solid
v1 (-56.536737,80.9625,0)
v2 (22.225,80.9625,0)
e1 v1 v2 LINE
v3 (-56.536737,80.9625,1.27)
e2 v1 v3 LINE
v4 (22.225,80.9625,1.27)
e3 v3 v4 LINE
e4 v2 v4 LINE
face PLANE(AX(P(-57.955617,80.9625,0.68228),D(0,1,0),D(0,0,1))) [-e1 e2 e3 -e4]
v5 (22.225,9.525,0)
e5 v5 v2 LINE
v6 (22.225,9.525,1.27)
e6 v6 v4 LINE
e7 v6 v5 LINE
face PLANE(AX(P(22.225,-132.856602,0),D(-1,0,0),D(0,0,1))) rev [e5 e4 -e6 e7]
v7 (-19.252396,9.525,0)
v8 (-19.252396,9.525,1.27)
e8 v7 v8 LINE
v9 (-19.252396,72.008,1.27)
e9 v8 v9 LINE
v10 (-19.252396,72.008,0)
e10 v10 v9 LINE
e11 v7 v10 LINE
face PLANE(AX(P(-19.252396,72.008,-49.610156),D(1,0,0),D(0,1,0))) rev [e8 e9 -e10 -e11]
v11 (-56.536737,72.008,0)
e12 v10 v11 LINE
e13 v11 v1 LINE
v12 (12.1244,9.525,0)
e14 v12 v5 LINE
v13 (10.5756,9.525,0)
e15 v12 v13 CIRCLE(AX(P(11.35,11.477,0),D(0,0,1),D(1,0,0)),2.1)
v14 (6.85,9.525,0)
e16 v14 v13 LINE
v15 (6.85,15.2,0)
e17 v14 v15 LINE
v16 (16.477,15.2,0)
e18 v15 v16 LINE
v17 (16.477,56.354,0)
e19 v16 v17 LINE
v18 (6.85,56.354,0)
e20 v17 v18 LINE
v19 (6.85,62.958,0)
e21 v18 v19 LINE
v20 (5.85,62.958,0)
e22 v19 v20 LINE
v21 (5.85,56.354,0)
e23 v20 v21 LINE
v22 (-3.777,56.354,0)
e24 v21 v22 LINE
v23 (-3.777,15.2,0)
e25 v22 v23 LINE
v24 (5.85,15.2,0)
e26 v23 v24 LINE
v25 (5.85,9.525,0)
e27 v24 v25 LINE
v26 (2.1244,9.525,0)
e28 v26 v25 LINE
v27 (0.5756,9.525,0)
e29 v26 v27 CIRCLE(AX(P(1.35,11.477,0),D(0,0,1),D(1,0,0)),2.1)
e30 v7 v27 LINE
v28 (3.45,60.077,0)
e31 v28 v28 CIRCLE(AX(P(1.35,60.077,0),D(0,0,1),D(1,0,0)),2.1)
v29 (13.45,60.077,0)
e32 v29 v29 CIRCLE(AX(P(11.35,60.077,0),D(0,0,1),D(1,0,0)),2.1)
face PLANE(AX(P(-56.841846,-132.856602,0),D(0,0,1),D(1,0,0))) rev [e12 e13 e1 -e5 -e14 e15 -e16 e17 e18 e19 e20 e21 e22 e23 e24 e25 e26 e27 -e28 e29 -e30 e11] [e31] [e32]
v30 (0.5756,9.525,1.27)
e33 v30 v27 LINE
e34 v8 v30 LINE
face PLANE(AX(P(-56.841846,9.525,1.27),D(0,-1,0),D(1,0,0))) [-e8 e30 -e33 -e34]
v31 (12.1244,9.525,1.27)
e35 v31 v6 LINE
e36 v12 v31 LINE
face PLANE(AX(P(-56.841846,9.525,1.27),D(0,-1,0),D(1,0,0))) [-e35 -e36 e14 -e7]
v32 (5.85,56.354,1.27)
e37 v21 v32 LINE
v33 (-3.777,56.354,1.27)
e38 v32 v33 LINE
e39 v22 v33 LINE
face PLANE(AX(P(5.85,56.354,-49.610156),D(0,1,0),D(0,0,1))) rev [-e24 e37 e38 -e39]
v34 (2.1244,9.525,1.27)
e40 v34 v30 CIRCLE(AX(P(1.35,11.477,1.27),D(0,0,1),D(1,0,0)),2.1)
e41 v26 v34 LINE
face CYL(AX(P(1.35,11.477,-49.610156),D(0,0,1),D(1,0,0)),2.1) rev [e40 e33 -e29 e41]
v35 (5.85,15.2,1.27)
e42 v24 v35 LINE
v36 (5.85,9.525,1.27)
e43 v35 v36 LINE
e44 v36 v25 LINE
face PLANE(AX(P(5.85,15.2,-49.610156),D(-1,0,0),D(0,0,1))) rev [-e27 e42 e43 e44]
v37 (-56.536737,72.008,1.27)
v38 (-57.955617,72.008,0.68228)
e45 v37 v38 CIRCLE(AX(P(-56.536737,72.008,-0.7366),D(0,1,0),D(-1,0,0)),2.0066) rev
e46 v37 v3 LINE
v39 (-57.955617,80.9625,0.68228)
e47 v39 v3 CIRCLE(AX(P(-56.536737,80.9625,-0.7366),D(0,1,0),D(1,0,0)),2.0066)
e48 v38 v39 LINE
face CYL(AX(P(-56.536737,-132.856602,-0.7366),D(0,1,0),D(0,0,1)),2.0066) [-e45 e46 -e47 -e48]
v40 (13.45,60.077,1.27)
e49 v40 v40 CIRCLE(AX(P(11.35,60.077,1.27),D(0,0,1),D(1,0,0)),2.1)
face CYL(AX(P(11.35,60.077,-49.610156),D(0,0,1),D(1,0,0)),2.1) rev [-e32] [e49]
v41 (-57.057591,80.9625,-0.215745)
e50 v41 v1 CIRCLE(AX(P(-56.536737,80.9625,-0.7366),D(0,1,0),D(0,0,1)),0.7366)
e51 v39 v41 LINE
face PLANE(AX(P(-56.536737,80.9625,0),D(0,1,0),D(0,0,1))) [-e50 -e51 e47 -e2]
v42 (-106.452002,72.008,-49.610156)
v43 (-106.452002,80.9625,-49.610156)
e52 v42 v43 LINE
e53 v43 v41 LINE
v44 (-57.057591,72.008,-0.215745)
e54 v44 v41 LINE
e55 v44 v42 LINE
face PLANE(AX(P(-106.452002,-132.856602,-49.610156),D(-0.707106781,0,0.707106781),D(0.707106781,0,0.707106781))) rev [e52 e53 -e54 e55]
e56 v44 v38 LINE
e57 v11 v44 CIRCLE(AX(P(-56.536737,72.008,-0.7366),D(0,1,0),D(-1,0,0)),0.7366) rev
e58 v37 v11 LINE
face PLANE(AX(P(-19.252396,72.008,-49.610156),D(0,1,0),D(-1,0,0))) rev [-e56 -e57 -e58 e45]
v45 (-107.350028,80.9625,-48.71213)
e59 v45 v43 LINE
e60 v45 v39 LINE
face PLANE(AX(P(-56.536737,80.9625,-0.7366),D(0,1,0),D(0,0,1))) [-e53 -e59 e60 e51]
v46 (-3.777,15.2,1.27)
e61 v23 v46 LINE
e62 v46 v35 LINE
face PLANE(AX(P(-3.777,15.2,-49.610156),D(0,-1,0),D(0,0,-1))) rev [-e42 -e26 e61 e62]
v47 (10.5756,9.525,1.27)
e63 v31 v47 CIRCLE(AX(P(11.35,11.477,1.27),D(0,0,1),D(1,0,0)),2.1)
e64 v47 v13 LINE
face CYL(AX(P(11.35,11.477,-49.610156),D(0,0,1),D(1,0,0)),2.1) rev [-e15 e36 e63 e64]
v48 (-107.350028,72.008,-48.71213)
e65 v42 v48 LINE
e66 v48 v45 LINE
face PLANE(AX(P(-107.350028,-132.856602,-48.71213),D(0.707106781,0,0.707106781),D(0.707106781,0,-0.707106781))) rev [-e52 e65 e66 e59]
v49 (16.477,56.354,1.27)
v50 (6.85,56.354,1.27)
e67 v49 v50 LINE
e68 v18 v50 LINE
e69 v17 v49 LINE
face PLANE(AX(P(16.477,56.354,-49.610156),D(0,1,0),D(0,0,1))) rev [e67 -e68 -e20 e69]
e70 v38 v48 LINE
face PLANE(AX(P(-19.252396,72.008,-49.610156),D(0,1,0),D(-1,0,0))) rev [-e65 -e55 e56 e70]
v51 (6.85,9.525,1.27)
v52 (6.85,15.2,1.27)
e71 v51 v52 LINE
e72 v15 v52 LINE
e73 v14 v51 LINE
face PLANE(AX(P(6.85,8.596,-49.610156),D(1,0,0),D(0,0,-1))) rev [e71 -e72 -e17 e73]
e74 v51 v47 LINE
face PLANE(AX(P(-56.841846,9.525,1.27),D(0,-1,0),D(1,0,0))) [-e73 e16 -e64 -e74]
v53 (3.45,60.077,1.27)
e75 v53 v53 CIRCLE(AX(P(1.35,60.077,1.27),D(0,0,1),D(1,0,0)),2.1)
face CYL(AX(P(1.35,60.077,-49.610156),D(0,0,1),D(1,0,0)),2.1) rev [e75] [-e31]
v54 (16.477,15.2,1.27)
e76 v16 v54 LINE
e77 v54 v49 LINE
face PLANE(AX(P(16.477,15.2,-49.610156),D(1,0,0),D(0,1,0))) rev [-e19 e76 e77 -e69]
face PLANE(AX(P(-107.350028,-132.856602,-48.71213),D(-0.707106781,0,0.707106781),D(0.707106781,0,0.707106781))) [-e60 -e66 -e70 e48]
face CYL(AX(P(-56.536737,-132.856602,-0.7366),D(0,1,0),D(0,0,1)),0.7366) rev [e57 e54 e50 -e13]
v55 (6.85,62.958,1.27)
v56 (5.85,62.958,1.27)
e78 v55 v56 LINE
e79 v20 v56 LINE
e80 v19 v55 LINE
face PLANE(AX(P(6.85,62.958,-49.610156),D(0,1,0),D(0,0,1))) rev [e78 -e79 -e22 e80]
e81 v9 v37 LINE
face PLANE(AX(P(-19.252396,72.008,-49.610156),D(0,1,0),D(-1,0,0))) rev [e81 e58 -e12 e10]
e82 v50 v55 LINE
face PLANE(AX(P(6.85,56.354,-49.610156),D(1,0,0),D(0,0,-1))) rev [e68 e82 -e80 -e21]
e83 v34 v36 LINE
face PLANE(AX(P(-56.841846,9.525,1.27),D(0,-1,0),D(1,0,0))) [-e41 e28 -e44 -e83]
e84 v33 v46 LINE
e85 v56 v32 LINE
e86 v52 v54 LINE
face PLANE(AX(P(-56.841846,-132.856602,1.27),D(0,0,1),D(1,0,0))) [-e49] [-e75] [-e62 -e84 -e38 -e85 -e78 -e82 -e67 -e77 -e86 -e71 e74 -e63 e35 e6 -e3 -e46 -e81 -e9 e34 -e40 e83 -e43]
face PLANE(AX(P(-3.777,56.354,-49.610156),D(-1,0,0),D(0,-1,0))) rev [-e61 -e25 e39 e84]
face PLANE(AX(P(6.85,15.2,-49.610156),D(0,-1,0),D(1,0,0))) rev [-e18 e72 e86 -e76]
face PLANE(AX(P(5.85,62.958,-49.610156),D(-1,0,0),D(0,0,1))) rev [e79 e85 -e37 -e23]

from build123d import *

# Parameters (mm, degrees)
BASE_FLANGE1_DEPTH      = 9.525
BASE_FLANGE1_DEPTH_BACK = 61.9125
SKETCH9_W               = 88.097631615
SKETCH9_H               = 62.483000002
CUT_EXTRUDE1_DEPTH      = 144.762808626
SKETCH12_R              = 2.099999991
CUT_EXTRUDE2_DEPTH      = 144.762808626


# Sheet-metal steps are written as plain solids
with BuildPart() as part:
    # Sketch2 → Base-Flange1 (new, two sides: drawn at the far end of the back side and taken through both)
    with BuildSketch(Plane(origin=(0, 71.4375, 0), x_dir=(1, 0, 0), z_dir=(0, 1, 0)).offset(-BASE_FLANGE1_DEPTH_BACK)):
        with BuildLine():
            Line((-106.452002215, 49.610155888), (-57.057591472, 0.215745145))
            ThreePointArc((-57.057591472, 0.215745145), (-56.818621234, 0.056070336), (-56.536736617, 0))
            Line((-56.536736617, 0), (22.225, 0))
            Line((22.225, 0), (22.225, -1.27))
            Line((22.225, -1.27), (-56.536736617, -1.27))
            ThreePointArc((-56.536736617, -1.27), (-57.304629193, -1.11725667), (-57.955617084, -0.682280467))
            Line((-57.955617084, -0.682280467), (-107.350027828, 48.712130276))
            Line((-107.350027828, 48.712130276), (-106.452002215, 49.610155888))
        make_face()
    extrude(amount=BASE_FLANGE1_DEPTH + BASE_FLANGE1_DEPTH_BACK)

    # Sketch9 → Cut-Extrude1 (cut, through all)
    with BuildSketch(Plane.XY.offset(1.27)):
        with Locations((-63.301212021, 40.766500001)):
            Rectangle(SKETCH9_W, SKETCH9_H)
    extrude(amount=-CUT_EXTRUDE1_DEPTH, mode=Mode.SUBTRACT)

    # Sketch12 → Cut-Extrude2 (cut, through all)
    with BuildSketch(Plane.XY.offset(1.27)):
        with Locations((11.350000033, 11.477000033)):
            Circle(SKETCH12_R)
        with Locations((1.349999967, 11.477000033)):
            Circle(SKETCH12_R)
        with Locations((11.350000033, 60.077000115)):
            Circle(SKETCH12_R)
        with Locations((1.349999967, 60.077000115)):
            Circle(SKETCH12_R)
        Polygon((6.85, 8.59600008), (5.85, 8.59600008), (5.85, 15.20000008), (-3.776999939, 15.20000008), (-3.776999939, 56.354000068), (5.85, 56.354000068), (5.85, 62.958000068), (6.85, 62.958000068), (6.85, 56.354000068), (16.476999939, 56.354000068), (16.476999939, 15.20000008), (6.85, 15.20000008), align=None)
    extrude(amount=-CUT_EXTRUDE2_DEPTH, mode=Mode.SUBTRACT)


solid = part.part
